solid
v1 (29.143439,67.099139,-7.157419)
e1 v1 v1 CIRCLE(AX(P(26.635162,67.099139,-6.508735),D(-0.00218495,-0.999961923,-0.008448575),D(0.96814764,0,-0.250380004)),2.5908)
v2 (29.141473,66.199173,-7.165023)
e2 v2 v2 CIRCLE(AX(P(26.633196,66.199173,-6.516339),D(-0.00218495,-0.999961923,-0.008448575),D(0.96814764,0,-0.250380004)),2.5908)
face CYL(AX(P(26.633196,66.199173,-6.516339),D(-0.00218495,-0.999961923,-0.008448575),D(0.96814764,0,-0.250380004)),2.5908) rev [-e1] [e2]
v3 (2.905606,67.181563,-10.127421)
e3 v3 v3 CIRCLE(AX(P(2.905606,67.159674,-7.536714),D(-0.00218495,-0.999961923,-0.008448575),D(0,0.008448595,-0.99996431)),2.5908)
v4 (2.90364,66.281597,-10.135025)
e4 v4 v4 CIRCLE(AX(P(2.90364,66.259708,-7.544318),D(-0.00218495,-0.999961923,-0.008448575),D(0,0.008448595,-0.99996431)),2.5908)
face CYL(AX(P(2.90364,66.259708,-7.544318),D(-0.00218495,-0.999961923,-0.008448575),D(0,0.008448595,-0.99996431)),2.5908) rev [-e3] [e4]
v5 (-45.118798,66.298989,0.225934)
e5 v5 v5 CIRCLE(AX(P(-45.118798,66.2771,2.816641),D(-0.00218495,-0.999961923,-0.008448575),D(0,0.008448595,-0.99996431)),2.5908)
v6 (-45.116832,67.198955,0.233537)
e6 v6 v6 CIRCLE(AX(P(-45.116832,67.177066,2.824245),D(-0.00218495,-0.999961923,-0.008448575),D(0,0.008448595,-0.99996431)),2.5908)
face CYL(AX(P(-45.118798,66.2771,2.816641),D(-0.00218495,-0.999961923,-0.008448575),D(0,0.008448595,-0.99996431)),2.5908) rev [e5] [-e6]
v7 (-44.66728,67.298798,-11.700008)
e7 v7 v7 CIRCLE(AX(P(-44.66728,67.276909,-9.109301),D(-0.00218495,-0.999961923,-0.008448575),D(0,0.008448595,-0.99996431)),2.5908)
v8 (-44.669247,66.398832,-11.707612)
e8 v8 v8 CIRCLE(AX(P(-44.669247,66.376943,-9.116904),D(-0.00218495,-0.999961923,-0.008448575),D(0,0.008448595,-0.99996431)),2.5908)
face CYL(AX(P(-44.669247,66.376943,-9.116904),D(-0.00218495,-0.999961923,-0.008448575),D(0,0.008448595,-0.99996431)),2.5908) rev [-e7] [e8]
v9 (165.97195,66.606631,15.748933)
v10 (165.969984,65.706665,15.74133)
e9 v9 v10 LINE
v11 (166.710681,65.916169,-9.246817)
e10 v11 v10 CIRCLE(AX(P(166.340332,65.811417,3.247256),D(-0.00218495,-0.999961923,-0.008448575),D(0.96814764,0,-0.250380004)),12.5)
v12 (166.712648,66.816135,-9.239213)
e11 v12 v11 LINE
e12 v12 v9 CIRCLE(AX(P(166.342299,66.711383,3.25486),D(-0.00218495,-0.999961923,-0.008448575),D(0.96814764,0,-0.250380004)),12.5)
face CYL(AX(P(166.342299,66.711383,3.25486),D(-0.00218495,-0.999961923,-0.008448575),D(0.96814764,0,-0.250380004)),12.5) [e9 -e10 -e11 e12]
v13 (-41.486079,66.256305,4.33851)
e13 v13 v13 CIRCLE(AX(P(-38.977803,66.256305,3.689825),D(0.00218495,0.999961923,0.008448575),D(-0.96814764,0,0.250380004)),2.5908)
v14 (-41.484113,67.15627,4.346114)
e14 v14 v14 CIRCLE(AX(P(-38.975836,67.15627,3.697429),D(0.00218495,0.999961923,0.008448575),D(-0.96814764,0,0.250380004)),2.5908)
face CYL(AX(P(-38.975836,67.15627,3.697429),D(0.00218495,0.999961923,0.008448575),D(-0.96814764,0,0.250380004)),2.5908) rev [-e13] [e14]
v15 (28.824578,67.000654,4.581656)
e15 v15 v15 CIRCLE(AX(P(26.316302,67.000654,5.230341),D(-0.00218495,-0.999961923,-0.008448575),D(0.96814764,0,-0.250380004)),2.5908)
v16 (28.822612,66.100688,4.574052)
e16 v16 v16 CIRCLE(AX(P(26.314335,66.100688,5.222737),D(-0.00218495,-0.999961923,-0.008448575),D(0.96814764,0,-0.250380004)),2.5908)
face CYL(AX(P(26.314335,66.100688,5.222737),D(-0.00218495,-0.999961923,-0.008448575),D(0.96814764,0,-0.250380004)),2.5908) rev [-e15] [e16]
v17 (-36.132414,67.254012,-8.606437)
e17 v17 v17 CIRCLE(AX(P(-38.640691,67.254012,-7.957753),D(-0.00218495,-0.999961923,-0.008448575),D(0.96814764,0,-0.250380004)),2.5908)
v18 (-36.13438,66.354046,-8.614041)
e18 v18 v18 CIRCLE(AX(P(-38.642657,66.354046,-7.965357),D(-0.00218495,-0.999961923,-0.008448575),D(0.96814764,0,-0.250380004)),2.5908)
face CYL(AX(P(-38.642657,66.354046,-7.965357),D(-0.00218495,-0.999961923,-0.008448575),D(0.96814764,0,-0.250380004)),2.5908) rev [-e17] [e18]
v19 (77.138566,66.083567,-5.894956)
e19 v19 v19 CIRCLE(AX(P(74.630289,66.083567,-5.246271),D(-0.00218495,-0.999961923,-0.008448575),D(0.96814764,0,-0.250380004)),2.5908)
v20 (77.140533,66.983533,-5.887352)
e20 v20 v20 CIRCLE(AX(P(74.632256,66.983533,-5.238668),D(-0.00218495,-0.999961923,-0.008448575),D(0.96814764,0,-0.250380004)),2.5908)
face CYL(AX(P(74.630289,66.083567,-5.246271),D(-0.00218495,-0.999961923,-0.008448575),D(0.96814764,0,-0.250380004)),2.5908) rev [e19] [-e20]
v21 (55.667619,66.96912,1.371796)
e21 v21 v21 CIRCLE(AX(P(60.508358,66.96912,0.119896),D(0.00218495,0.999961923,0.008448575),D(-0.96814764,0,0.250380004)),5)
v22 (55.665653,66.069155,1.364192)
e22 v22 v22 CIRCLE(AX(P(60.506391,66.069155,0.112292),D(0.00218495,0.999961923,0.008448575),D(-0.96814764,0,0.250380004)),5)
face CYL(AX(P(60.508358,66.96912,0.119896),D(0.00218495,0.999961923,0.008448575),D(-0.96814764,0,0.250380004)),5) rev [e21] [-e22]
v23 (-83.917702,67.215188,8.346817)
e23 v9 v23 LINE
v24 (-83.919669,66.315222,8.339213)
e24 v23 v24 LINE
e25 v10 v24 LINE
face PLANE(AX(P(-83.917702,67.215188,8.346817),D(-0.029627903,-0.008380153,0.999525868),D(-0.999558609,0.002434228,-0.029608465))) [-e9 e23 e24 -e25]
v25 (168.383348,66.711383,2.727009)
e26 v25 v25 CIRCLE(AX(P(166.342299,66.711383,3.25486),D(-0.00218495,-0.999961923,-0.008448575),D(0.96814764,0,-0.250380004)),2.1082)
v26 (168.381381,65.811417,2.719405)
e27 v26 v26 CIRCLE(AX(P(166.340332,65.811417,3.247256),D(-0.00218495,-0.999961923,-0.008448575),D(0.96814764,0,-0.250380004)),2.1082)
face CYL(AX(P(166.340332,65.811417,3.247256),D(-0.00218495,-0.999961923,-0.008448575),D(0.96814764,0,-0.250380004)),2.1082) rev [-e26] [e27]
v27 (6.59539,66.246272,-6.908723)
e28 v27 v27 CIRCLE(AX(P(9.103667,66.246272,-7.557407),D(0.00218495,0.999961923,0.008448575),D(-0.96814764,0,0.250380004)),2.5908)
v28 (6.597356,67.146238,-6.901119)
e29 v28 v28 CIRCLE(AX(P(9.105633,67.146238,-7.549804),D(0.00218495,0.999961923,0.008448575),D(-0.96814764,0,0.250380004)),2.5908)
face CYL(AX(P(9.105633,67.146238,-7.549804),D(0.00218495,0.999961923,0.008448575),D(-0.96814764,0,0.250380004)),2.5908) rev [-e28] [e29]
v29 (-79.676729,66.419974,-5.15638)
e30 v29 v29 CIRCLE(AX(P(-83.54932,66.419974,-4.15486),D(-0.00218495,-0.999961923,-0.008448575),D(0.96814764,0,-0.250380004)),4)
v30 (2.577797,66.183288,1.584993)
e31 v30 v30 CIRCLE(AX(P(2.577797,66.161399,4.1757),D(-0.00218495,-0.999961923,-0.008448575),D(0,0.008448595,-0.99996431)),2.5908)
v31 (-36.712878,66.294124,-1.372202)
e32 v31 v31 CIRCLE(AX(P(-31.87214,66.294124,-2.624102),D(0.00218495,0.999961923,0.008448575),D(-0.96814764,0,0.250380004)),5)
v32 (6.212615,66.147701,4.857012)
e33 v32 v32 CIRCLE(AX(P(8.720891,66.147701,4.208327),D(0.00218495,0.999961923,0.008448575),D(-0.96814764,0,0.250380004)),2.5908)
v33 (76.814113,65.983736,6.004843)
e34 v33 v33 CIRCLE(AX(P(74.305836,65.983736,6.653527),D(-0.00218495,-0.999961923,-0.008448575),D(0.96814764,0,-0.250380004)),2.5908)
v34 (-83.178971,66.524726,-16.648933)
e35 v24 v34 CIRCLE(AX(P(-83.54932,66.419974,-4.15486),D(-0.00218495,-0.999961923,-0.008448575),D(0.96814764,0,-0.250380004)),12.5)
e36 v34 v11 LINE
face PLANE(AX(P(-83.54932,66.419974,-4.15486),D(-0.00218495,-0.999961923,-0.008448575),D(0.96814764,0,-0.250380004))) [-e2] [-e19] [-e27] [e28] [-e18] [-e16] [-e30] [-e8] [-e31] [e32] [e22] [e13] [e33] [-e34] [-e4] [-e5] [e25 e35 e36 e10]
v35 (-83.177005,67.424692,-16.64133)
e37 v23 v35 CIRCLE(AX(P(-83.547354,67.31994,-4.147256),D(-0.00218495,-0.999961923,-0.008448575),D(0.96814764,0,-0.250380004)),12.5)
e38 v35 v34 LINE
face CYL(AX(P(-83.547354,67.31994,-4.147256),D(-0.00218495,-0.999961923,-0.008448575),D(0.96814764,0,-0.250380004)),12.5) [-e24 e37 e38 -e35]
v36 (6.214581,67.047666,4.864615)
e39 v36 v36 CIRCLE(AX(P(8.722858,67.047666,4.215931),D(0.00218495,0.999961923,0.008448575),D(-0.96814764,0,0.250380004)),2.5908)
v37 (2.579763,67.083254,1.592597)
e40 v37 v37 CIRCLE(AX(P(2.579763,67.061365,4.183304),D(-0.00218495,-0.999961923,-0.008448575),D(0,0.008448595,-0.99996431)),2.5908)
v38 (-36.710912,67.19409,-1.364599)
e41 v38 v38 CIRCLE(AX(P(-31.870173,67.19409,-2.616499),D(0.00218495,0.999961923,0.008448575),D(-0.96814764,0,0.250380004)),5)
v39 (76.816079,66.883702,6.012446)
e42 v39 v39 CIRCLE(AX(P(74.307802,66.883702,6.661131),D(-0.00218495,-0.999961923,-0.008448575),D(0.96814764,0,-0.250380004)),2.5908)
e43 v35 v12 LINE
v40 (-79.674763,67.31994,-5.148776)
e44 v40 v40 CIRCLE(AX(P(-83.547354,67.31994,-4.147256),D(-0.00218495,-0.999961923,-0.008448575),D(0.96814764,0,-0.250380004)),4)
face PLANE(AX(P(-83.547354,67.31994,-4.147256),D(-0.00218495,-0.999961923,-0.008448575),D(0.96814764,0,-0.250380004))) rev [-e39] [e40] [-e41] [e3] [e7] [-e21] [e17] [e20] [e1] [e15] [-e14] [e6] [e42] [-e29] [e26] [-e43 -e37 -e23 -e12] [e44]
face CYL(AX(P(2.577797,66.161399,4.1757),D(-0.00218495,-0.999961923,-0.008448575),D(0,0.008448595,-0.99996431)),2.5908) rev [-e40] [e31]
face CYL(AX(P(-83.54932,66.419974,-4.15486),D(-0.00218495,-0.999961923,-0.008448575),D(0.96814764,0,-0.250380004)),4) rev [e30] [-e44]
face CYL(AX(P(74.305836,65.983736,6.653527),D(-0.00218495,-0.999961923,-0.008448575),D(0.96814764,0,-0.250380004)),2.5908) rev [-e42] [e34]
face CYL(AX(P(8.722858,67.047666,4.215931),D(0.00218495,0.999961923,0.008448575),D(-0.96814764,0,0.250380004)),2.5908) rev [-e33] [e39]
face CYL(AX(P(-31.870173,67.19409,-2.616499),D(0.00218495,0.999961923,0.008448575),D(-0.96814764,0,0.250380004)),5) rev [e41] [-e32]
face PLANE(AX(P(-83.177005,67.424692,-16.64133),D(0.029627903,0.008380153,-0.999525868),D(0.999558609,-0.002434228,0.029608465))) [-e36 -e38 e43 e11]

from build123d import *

# Parameters (mm, degrees)
BASE_FLANGE1_DEPTH          = 0.9
SKETCH7_R                   = 1.75
CUT_EXTRUDE1_DEPTH          = 10
F_6_0_204_DIAMETER_SLOT1_D  = 5.1816
F_1_0MM_DOWEL_SLOT1_D       = 8
F_19_0_166_DIAMETER_SLOT2_D = 4.2164
F_10_0MM_DOWEL_SLOT1_D      = 10
F_6_0_204_DIAMETER_SLOT7_D  = 5.1816
F_6_0_204_DIAMETER_SLOT9_D  = 5.1816
F_6_0_204_DIAMETER_SLOT10_D = 5.1816
BODY_MOVE_COPY1_ANGLE       = 90
BODY_MOVE_COPY2_ANGLE       = 14.508572097
F_6_0_204_DIAMETER_SLOT11_D = 5.1816


# Sheet-metal steps are written as plain solids
with BuildPart() as part:
    # Sketch1 → Base-Flange1 (new body)
    with BuildSketch(Plane.XY):
        with BuildLine():
            Line((-82.128696711, 43.701330638), (157.948038639, 113.437699511))
            ThreePointArc((157.948038639, 113.437699511), (173.43869385, 104.920681188), (164.921675527, 89.430025976))
            Line((164.921675527, 89.430025976), (-75.155059823, 19.693657103))
            ThreePointArc((-75.155059823, 19.693657103), (-90.645715035, 28.210675427), (-82.128696711, 43.701330638))
        make_face()
    extrude(amount=-BASE_FLANGE1_DEPTH)

    # Sketch7 → Cut-Extrude1 (cut)
    with BuildSketch(Plane.XY):
        with Locations((-78.641878267, 31.69749387)):
            Circle(SKETCH7_R)
    extrude(amount=-CUT_EXTRUDE1_DEPTH, mode=Mode.SUBTRACT)

    # #6 (0.204) Diameter Slot1 (through all)
    with Locations(Plane.XY):
        with Locations((-34.211526563, 39.252388593)):
            Hole(F_6_0_204_DIAMETER_SLOT1_D / 2)

    # Ø1.0mm Dowel Slot1 (through all)
    with Locations(Plane.XY):
        with Locations((-78.641878267, 31.69749387)):
            Hole(F_1_0MM_DOWEL_SLOT1_D / 2)

    # #19 (0.166) Diameter Slot2 (through all)
    with Locations(Plane.XY):
        with Locations((161.434857083, 101.433862744)):
            Hole(F_19_0_166_DIAMETER_SLOT2_D / 2)

    # Ø10.0mm Dowel Slot1 (through all)
    with Locations(Plane(origin=(0, 0, -0.9), x_dir=(-1, 0, 0), z_dir=(0, 0, -1))):
        with Locations((28.994009397, 46.118974953), (-59.756909092, 71.89892727)):
            Hole(F_10_0MM_DOWEL_SLOT1_D / 2)

    # #6 (0.204) Diameter Slot7 (through all)
    with Locations(Plane(origin=(0, 0, -0.9), x_dir=(-1, 0, 0), z_dir=(0, 0, -1))):
        with Locations((37.45422118, 50.452838291)):
            Hole(F_6_0_204_DIAMETER_SLOT7_D / 2)

    # #6 (0.204) Diameter Slot9 (through all)
    with Locations(Plane.XY):
        with Locations((28.62233158, 56.99969603), (25.374397473, 68.28544764), (74.772604857, 70.247325472), (71.479014493, 81.687286544)):
            Hole(F_6_0_204_DIAMETER_SLOT9_D / 2)

    # #6 (0.204) Diameter Slot10 (through all)
    with Locations(Plane(origin=(0, 0, -0.9), x_dir=(-1, 0, 0), z_dir=(0, 0, -1))):
        with Locations((-8.595334372, 62.898097763), (-11.911821865, 51.602538742)):
            Hole(F_6_0_204_DIAMETER_SLOT10_D / 2)


with BuildPart() as part_1:
    # Body-Move/Copy1: moved
    add(part.part.rotate(Axis((0, 66.565678307, -0.45), (1, 0, 0)), BODY_MOVE_COPY1_ANGLE))


with BuildPart() as part_2:
    # Body-Move/Copy2: moved
    add(part_1.part.moved(Location((0, 0, 0))).rotate(Axis((39.067388507, -1.340632846, -0.153700941), (0.03427825712896061, 0.9994028141797792, -0.004360745089880855)), BODY_MOVE_COPY2_ANGLE))

    # #6 (0.204) Diameter Slot11 (through all)
    with Locations(Plane(origin=(0.144643233, 66.197270405, 0.559293884), x_dir=(-0.9999976129939137, 0.0021848720127792104, 1.845975741503872e-05), z_dir=(-0.002184949993677132, -0.999961923064164, -0.00844857475223902))):
        with Locations((-2.433159338, -3.616580433), (-2.759003314, 8.103849751), (45.263549296, -2.25659234), (44.813996852, 9.677370774)):
            Hole(F_6_0_204_DIAMETER_SLOT11_D / 2)


solid = part_2.part
